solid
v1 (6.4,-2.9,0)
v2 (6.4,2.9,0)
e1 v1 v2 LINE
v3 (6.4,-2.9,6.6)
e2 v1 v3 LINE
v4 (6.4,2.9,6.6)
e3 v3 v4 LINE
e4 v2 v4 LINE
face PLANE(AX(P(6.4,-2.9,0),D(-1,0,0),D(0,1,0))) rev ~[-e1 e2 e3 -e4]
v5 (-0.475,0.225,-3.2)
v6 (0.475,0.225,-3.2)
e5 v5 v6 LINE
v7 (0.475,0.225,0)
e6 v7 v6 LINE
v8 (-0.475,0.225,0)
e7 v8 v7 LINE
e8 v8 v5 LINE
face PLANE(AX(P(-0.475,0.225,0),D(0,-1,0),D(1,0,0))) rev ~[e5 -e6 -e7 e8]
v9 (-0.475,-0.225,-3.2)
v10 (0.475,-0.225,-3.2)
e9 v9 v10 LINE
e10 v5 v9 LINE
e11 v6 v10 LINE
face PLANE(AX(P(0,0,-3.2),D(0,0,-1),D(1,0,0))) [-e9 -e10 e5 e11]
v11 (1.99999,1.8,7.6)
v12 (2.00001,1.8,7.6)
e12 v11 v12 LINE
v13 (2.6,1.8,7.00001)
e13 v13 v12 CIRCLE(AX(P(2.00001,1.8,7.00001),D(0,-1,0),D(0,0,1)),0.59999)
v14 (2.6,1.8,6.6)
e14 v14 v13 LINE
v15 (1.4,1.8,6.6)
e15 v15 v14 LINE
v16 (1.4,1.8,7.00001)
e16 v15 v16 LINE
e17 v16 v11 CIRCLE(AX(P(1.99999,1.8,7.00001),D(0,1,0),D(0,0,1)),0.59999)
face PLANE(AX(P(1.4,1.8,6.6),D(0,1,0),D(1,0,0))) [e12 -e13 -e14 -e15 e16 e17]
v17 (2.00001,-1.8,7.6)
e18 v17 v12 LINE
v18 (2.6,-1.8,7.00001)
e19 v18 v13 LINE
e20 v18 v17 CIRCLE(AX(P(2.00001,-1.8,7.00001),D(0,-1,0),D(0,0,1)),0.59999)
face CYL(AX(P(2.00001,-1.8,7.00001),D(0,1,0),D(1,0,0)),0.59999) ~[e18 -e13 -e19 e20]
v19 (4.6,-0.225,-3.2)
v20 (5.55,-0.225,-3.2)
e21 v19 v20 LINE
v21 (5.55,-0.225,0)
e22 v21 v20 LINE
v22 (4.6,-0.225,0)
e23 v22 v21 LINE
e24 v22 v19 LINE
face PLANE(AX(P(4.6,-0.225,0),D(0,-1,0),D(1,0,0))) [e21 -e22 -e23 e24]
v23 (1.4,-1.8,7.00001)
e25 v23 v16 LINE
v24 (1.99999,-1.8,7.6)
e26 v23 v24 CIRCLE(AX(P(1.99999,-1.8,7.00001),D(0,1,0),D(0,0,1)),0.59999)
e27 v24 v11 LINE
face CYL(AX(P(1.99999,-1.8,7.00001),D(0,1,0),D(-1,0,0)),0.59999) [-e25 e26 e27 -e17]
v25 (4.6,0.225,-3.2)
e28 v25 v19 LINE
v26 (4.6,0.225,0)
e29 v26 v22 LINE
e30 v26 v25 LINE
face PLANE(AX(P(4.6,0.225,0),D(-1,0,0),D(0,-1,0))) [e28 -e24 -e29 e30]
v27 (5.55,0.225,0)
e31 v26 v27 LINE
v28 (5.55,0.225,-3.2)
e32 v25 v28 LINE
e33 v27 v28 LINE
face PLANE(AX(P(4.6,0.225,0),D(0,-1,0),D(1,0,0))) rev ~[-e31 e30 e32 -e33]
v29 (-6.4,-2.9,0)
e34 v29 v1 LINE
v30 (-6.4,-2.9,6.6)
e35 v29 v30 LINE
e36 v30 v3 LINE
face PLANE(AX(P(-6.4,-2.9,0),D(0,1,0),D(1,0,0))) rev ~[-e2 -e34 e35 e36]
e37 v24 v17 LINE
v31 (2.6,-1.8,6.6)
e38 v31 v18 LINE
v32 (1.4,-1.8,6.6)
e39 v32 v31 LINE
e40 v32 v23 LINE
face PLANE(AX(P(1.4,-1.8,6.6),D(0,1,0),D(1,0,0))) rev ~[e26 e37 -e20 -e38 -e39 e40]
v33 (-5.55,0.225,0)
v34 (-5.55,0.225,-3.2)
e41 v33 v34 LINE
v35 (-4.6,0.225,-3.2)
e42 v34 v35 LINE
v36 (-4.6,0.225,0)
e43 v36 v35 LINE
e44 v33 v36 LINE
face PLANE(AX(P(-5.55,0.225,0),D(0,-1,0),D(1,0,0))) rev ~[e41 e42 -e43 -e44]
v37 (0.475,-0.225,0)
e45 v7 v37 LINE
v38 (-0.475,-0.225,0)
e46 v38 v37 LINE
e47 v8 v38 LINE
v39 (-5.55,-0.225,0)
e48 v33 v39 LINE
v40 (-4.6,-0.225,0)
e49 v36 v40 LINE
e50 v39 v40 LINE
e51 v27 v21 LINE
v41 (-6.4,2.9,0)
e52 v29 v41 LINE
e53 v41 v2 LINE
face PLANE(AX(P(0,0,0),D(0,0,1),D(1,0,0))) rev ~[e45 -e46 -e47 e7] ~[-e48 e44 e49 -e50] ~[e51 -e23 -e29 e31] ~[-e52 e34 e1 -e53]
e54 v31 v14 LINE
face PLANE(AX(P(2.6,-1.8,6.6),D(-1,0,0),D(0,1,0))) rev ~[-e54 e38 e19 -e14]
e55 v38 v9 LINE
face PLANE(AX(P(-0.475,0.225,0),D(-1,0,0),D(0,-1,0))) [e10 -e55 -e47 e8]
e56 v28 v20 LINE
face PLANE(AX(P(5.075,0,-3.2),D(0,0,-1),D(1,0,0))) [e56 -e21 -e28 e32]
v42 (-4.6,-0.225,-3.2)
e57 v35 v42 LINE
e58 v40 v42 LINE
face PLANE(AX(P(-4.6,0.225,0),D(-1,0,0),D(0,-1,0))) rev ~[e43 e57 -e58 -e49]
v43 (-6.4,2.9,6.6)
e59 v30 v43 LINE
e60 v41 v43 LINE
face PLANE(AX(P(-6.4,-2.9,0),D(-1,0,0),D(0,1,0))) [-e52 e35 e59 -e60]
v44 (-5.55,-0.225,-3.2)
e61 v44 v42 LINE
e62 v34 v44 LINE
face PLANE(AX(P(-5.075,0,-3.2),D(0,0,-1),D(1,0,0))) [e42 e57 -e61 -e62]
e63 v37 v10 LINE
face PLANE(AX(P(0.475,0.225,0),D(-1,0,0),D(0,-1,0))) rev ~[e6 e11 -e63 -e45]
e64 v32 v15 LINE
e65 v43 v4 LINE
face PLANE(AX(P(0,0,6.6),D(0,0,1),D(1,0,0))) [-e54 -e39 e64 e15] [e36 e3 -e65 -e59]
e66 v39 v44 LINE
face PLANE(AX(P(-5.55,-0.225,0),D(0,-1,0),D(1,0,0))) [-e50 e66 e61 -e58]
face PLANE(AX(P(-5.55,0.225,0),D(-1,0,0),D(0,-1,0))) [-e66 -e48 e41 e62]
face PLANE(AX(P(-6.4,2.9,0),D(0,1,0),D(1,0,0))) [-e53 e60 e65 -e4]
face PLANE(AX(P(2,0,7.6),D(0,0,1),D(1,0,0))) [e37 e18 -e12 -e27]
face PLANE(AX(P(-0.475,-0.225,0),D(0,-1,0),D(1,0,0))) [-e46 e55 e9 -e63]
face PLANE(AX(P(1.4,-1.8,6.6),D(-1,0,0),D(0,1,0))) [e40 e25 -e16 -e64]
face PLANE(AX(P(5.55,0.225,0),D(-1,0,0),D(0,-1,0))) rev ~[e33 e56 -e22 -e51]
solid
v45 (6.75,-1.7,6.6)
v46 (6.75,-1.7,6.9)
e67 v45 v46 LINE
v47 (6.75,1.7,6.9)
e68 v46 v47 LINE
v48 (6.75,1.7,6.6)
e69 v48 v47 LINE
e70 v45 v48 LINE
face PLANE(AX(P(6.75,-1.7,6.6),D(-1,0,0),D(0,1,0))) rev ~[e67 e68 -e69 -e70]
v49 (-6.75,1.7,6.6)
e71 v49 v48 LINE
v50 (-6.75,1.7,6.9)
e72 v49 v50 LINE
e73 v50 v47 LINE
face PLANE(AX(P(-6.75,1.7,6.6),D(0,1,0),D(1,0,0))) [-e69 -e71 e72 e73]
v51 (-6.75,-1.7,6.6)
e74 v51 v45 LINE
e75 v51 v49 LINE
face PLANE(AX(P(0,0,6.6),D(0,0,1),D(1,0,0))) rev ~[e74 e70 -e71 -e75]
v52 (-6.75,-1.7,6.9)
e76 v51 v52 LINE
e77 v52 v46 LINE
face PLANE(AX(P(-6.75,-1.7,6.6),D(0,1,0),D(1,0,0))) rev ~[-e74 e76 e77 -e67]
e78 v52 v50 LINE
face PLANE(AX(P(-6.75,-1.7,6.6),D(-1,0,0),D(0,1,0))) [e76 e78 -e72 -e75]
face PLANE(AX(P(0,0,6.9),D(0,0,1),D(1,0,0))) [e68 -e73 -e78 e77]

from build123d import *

# Parameters (mm, degrees)
F0_W     = 12.8
F0_H     = 5.8
F1_DEPTH = 6.6
F2_W     = 0.95
F2_H     = 0.45
F3_DEPTH = 3.2
F4_W     = 1.2
F4_H     = 3.6
F5_DEPTH = 1
F6_R     = 0.59999
F7_W     = 13.5
F7_H     = 3.4
F8_DEPTH = 0.3


# Not quite as in the source:
# - a fillet or chamfer is up to 0.001 mm smaller than in the source, because OpenCascade refuses the exact size


with BuildPart() as f1:
    # F0 (on Top) → F1 (new body)
    with BuildSketch(Plane.XY):
        Rectangle(F0_W, F0_H)
    extrude(amount=F1_DEPTH)

    # F2 (on face) → F3 (join)
    with BuildSketch(Plane(origin=(0, 0, 0), x_dir=(1, 0, 0), z_dir=(0, 0, -1))):
        with Locations((-5.075, 0)):
            Rectangle(F2_W, F2_H)
        Rectangle(F2_W, F2_H)
        with Locations((5.075, 0)):
            Rectangle(F2_W, F2_H)
    extrude(amount=F3_DEPTH)

    # F4 (on face) → F5 (join)
    with BuildSketch(Plane.XY.offset(6.6)):
        with Locations((2, 0)):
            Rectangle(F4_W, F4_H)
    extrude(amount=F5_DEPTH)

    # F6 (radius 0.6 in the source; OpenCascade refuses exactly that, so slightly less here)
    f6_edges = [f1.edges().sort_by_distance(p)[0] for p in [
        (1.4, 0, 7.6),
        (2.6, 0, 7.6),
    ]]
    fillet(f6_edges, radius=F6_R)


with BuildPart() as f8:
    # F7 (on face) → F8 (new body)
    with BuildSketch(Plane.XY.offset(6.6)):
        Rectangle(F7_W, F7_H)
    extrude(amount=F8_DEPTH)


solid = Compound([f1.part, f8.part])
